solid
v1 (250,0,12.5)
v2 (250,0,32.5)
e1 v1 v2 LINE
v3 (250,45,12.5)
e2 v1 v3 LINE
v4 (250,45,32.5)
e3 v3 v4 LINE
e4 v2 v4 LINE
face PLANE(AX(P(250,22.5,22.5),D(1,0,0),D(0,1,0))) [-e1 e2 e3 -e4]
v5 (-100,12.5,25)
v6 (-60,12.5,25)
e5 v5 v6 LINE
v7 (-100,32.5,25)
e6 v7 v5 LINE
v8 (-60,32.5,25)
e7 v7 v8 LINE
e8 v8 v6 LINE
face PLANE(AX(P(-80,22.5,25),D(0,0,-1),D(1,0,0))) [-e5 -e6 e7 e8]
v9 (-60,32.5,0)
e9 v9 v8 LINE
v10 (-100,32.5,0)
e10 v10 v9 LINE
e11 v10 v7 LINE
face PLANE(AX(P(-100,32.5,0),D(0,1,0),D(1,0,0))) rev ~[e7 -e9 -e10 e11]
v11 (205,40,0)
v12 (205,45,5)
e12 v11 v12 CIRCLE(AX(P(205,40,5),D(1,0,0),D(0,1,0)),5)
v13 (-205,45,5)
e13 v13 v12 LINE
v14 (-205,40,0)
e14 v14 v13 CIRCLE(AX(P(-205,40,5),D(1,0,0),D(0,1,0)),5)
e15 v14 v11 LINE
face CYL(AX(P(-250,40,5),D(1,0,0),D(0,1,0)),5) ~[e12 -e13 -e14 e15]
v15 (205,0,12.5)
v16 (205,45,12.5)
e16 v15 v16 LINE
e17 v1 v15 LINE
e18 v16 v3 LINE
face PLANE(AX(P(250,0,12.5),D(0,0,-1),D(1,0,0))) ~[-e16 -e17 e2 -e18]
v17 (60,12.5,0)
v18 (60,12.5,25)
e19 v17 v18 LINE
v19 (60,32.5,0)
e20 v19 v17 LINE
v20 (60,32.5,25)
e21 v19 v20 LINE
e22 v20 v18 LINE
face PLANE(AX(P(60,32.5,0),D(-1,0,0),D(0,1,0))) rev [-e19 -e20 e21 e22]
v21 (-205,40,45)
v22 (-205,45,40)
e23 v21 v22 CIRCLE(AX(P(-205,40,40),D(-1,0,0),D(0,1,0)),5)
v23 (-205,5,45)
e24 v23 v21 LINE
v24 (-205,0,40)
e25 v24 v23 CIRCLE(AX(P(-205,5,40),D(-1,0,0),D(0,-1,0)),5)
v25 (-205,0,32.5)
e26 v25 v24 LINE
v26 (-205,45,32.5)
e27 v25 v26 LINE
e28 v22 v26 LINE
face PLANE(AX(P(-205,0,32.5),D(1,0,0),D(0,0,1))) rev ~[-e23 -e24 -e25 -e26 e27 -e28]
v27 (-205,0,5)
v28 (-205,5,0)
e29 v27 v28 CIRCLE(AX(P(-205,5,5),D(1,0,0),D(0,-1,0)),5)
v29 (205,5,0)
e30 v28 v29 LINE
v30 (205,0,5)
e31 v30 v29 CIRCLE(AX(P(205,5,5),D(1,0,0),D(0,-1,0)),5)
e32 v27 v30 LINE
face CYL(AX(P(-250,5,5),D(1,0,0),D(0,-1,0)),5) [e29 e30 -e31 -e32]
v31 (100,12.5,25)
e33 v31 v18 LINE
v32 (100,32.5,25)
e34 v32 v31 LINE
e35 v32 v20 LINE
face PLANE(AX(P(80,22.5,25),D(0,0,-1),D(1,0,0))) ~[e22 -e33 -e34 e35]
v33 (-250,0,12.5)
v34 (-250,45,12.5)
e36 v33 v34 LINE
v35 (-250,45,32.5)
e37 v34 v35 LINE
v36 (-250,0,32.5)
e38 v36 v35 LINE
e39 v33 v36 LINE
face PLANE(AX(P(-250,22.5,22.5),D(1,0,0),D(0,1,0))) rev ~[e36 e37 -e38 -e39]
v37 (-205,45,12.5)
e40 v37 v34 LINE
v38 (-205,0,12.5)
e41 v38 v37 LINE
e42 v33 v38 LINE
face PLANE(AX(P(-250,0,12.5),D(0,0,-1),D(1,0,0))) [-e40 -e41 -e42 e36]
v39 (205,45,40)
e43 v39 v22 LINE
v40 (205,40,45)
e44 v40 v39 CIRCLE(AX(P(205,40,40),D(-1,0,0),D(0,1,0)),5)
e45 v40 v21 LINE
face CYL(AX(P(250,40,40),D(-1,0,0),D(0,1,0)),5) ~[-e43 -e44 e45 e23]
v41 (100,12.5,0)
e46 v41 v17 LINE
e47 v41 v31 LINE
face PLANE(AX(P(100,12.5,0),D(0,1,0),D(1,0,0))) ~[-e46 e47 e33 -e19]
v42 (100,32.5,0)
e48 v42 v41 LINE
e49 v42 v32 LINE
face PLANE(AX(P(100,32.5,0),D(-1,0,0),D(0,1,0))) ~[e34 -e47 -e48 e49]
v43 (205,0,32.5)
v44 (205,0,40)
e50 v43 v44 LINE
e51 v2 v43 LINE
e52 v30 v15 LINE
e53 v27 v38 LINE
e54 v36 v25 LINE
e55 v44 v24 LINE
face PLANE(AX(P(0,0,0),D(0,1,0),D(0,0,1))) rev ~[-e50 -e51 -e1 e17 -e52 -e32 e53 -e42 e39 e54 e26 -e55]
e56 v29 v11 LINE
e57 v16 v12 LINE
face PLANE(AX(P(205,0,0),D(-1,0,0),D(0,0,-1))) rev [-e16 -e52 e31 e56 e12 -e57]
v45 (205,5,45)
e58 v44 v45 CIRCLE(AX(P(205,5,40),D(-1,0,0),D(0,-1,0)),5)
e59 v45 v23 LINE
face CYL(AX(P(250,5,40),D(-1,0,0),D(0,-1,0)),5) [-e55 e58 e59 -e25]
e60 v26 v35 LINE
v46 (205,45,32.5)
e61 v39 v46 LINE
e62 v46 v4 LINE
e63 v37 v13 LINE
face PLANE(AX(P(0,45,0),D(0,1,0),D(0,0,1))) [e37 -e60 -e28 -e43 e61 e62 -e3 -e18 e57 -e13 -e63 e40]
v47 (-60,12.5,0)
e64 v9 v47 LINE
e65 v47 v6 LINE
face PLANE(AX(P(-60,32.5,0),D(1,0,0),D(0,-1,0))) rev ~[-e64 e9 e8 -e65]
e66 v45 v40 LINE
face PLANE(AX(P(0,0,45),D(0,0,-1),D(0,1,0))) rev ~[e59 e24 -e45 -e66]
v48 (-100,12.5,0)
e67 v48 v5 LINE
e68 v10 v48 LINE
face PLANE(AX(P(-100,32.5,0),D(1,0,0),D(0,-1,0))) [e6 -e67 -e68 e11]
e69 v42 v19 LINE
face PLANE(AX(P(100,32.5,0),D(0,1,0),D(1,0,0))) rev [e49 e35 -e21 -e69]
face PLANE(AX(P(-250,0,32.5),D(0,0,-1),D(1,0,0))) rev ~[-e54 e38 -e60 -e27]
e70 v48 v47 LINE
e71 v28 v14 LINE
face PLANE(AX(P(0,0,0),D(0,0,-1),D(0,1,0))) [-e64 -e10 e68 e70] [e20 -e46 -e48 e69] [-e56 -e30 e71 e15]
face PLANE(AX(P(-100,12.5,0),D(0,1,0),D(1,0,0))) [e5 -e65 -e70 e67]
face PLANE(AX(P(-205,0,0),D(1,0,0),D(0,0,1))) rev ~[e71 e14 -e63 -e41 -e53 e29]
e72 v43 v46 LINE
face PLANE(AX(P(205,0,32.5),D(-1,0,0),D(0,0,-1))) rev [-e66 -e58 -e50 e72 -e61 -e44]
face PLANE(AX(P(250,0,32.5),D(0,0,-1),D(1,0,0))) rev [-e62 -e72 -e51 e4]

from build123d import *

# Parameters (mm, degrees)
F0_W     = 45
F0_H     = 45
F1_DEPTH = 250
F2_R     = 5
F3_W     = 45
F3_H     = 12.5
F4_DEPTH = 45.001
F5_W     = 40
F5_H     = 20
F6_DEPTH = 25
F7_W     = 40
F7_H     = 20
F8_DEPTH = 25


# Not quite as in the source:
# - a pattern or mirror of a feature is missing from the dataset's text; its kind, count and spacing are read off the source's solid


with BuildPart() as f1:
    # F0 (on Right) → F1 (new body, symmetric)
    with BuildSketch(Plane.YZ):
        with Locations((22.5, 22.5)):
            Rectangle(F0_W, F0_H)
    extrude(amount=F1_DEPTH, both=True)

    # F2
    f2_edges = [f1.edges().sort_by_distance(p)[0] for p in [
        (0, 0, 45),
        (0, 45, 45),
        (0, 0, 0),
        (0, 45, 0),
    ]]
    fillet(f2_edges, radius=F2_R)

    # F3 (on face) → F4 (cut, through all)
    with BuildSketch(Plane.XZ):
        with Locations((-227.5, 6.25)):
            Rectangle(F3_W, F3_H)
        with Locations((-227.5, 38.75)):
            Rectangle(F3_W, F3_H)
    f4 = extrude(amount=-F4_DEPTH, mode=Mode.SUBTRACT)

    # F4_copies: F4 across plane
    add(f4.mirror(Plane(origin=(0, 0, 0), x_dir=(0, 0, 1), z_dir=(1, 0, 0))), mode=Mode.SUBTRACT)

    # F5 (on face) → F6 (cut)
    with BuildSketch(Plane(origin=(-250, 0, 0), x_dir=(0, -1, 0), z_dir=(-1, 0, 0))):
        with Locations((150, 22.5)):
            Rectangle(F5_W, F5_H)
    extrude(amount=-F6_DEPTH, mode=Mode.SUBTRACT)

    # F7 (on face) → F8 (cut)
    with BuildSketch(Plane(origin=(0, 0, 0), x_dir=(1, 0, 0), z_dir=(0, 0, -1))):
        with Locations((-80, -22.5)):
            Rectangle(F7_W, F7_H)
    f8 = extrude(amount=-F8_DEPTH, mode=Mode.SUBTRACT)

    # F8_copies: F8 across plane
    add(f8.mirror(Plane(origin=(0, 0, 0), x_dir=(0, 0, 1), z_dir=(1, 0, 0))), mode=Mode.SUBTRACT)


solid = f1.part
